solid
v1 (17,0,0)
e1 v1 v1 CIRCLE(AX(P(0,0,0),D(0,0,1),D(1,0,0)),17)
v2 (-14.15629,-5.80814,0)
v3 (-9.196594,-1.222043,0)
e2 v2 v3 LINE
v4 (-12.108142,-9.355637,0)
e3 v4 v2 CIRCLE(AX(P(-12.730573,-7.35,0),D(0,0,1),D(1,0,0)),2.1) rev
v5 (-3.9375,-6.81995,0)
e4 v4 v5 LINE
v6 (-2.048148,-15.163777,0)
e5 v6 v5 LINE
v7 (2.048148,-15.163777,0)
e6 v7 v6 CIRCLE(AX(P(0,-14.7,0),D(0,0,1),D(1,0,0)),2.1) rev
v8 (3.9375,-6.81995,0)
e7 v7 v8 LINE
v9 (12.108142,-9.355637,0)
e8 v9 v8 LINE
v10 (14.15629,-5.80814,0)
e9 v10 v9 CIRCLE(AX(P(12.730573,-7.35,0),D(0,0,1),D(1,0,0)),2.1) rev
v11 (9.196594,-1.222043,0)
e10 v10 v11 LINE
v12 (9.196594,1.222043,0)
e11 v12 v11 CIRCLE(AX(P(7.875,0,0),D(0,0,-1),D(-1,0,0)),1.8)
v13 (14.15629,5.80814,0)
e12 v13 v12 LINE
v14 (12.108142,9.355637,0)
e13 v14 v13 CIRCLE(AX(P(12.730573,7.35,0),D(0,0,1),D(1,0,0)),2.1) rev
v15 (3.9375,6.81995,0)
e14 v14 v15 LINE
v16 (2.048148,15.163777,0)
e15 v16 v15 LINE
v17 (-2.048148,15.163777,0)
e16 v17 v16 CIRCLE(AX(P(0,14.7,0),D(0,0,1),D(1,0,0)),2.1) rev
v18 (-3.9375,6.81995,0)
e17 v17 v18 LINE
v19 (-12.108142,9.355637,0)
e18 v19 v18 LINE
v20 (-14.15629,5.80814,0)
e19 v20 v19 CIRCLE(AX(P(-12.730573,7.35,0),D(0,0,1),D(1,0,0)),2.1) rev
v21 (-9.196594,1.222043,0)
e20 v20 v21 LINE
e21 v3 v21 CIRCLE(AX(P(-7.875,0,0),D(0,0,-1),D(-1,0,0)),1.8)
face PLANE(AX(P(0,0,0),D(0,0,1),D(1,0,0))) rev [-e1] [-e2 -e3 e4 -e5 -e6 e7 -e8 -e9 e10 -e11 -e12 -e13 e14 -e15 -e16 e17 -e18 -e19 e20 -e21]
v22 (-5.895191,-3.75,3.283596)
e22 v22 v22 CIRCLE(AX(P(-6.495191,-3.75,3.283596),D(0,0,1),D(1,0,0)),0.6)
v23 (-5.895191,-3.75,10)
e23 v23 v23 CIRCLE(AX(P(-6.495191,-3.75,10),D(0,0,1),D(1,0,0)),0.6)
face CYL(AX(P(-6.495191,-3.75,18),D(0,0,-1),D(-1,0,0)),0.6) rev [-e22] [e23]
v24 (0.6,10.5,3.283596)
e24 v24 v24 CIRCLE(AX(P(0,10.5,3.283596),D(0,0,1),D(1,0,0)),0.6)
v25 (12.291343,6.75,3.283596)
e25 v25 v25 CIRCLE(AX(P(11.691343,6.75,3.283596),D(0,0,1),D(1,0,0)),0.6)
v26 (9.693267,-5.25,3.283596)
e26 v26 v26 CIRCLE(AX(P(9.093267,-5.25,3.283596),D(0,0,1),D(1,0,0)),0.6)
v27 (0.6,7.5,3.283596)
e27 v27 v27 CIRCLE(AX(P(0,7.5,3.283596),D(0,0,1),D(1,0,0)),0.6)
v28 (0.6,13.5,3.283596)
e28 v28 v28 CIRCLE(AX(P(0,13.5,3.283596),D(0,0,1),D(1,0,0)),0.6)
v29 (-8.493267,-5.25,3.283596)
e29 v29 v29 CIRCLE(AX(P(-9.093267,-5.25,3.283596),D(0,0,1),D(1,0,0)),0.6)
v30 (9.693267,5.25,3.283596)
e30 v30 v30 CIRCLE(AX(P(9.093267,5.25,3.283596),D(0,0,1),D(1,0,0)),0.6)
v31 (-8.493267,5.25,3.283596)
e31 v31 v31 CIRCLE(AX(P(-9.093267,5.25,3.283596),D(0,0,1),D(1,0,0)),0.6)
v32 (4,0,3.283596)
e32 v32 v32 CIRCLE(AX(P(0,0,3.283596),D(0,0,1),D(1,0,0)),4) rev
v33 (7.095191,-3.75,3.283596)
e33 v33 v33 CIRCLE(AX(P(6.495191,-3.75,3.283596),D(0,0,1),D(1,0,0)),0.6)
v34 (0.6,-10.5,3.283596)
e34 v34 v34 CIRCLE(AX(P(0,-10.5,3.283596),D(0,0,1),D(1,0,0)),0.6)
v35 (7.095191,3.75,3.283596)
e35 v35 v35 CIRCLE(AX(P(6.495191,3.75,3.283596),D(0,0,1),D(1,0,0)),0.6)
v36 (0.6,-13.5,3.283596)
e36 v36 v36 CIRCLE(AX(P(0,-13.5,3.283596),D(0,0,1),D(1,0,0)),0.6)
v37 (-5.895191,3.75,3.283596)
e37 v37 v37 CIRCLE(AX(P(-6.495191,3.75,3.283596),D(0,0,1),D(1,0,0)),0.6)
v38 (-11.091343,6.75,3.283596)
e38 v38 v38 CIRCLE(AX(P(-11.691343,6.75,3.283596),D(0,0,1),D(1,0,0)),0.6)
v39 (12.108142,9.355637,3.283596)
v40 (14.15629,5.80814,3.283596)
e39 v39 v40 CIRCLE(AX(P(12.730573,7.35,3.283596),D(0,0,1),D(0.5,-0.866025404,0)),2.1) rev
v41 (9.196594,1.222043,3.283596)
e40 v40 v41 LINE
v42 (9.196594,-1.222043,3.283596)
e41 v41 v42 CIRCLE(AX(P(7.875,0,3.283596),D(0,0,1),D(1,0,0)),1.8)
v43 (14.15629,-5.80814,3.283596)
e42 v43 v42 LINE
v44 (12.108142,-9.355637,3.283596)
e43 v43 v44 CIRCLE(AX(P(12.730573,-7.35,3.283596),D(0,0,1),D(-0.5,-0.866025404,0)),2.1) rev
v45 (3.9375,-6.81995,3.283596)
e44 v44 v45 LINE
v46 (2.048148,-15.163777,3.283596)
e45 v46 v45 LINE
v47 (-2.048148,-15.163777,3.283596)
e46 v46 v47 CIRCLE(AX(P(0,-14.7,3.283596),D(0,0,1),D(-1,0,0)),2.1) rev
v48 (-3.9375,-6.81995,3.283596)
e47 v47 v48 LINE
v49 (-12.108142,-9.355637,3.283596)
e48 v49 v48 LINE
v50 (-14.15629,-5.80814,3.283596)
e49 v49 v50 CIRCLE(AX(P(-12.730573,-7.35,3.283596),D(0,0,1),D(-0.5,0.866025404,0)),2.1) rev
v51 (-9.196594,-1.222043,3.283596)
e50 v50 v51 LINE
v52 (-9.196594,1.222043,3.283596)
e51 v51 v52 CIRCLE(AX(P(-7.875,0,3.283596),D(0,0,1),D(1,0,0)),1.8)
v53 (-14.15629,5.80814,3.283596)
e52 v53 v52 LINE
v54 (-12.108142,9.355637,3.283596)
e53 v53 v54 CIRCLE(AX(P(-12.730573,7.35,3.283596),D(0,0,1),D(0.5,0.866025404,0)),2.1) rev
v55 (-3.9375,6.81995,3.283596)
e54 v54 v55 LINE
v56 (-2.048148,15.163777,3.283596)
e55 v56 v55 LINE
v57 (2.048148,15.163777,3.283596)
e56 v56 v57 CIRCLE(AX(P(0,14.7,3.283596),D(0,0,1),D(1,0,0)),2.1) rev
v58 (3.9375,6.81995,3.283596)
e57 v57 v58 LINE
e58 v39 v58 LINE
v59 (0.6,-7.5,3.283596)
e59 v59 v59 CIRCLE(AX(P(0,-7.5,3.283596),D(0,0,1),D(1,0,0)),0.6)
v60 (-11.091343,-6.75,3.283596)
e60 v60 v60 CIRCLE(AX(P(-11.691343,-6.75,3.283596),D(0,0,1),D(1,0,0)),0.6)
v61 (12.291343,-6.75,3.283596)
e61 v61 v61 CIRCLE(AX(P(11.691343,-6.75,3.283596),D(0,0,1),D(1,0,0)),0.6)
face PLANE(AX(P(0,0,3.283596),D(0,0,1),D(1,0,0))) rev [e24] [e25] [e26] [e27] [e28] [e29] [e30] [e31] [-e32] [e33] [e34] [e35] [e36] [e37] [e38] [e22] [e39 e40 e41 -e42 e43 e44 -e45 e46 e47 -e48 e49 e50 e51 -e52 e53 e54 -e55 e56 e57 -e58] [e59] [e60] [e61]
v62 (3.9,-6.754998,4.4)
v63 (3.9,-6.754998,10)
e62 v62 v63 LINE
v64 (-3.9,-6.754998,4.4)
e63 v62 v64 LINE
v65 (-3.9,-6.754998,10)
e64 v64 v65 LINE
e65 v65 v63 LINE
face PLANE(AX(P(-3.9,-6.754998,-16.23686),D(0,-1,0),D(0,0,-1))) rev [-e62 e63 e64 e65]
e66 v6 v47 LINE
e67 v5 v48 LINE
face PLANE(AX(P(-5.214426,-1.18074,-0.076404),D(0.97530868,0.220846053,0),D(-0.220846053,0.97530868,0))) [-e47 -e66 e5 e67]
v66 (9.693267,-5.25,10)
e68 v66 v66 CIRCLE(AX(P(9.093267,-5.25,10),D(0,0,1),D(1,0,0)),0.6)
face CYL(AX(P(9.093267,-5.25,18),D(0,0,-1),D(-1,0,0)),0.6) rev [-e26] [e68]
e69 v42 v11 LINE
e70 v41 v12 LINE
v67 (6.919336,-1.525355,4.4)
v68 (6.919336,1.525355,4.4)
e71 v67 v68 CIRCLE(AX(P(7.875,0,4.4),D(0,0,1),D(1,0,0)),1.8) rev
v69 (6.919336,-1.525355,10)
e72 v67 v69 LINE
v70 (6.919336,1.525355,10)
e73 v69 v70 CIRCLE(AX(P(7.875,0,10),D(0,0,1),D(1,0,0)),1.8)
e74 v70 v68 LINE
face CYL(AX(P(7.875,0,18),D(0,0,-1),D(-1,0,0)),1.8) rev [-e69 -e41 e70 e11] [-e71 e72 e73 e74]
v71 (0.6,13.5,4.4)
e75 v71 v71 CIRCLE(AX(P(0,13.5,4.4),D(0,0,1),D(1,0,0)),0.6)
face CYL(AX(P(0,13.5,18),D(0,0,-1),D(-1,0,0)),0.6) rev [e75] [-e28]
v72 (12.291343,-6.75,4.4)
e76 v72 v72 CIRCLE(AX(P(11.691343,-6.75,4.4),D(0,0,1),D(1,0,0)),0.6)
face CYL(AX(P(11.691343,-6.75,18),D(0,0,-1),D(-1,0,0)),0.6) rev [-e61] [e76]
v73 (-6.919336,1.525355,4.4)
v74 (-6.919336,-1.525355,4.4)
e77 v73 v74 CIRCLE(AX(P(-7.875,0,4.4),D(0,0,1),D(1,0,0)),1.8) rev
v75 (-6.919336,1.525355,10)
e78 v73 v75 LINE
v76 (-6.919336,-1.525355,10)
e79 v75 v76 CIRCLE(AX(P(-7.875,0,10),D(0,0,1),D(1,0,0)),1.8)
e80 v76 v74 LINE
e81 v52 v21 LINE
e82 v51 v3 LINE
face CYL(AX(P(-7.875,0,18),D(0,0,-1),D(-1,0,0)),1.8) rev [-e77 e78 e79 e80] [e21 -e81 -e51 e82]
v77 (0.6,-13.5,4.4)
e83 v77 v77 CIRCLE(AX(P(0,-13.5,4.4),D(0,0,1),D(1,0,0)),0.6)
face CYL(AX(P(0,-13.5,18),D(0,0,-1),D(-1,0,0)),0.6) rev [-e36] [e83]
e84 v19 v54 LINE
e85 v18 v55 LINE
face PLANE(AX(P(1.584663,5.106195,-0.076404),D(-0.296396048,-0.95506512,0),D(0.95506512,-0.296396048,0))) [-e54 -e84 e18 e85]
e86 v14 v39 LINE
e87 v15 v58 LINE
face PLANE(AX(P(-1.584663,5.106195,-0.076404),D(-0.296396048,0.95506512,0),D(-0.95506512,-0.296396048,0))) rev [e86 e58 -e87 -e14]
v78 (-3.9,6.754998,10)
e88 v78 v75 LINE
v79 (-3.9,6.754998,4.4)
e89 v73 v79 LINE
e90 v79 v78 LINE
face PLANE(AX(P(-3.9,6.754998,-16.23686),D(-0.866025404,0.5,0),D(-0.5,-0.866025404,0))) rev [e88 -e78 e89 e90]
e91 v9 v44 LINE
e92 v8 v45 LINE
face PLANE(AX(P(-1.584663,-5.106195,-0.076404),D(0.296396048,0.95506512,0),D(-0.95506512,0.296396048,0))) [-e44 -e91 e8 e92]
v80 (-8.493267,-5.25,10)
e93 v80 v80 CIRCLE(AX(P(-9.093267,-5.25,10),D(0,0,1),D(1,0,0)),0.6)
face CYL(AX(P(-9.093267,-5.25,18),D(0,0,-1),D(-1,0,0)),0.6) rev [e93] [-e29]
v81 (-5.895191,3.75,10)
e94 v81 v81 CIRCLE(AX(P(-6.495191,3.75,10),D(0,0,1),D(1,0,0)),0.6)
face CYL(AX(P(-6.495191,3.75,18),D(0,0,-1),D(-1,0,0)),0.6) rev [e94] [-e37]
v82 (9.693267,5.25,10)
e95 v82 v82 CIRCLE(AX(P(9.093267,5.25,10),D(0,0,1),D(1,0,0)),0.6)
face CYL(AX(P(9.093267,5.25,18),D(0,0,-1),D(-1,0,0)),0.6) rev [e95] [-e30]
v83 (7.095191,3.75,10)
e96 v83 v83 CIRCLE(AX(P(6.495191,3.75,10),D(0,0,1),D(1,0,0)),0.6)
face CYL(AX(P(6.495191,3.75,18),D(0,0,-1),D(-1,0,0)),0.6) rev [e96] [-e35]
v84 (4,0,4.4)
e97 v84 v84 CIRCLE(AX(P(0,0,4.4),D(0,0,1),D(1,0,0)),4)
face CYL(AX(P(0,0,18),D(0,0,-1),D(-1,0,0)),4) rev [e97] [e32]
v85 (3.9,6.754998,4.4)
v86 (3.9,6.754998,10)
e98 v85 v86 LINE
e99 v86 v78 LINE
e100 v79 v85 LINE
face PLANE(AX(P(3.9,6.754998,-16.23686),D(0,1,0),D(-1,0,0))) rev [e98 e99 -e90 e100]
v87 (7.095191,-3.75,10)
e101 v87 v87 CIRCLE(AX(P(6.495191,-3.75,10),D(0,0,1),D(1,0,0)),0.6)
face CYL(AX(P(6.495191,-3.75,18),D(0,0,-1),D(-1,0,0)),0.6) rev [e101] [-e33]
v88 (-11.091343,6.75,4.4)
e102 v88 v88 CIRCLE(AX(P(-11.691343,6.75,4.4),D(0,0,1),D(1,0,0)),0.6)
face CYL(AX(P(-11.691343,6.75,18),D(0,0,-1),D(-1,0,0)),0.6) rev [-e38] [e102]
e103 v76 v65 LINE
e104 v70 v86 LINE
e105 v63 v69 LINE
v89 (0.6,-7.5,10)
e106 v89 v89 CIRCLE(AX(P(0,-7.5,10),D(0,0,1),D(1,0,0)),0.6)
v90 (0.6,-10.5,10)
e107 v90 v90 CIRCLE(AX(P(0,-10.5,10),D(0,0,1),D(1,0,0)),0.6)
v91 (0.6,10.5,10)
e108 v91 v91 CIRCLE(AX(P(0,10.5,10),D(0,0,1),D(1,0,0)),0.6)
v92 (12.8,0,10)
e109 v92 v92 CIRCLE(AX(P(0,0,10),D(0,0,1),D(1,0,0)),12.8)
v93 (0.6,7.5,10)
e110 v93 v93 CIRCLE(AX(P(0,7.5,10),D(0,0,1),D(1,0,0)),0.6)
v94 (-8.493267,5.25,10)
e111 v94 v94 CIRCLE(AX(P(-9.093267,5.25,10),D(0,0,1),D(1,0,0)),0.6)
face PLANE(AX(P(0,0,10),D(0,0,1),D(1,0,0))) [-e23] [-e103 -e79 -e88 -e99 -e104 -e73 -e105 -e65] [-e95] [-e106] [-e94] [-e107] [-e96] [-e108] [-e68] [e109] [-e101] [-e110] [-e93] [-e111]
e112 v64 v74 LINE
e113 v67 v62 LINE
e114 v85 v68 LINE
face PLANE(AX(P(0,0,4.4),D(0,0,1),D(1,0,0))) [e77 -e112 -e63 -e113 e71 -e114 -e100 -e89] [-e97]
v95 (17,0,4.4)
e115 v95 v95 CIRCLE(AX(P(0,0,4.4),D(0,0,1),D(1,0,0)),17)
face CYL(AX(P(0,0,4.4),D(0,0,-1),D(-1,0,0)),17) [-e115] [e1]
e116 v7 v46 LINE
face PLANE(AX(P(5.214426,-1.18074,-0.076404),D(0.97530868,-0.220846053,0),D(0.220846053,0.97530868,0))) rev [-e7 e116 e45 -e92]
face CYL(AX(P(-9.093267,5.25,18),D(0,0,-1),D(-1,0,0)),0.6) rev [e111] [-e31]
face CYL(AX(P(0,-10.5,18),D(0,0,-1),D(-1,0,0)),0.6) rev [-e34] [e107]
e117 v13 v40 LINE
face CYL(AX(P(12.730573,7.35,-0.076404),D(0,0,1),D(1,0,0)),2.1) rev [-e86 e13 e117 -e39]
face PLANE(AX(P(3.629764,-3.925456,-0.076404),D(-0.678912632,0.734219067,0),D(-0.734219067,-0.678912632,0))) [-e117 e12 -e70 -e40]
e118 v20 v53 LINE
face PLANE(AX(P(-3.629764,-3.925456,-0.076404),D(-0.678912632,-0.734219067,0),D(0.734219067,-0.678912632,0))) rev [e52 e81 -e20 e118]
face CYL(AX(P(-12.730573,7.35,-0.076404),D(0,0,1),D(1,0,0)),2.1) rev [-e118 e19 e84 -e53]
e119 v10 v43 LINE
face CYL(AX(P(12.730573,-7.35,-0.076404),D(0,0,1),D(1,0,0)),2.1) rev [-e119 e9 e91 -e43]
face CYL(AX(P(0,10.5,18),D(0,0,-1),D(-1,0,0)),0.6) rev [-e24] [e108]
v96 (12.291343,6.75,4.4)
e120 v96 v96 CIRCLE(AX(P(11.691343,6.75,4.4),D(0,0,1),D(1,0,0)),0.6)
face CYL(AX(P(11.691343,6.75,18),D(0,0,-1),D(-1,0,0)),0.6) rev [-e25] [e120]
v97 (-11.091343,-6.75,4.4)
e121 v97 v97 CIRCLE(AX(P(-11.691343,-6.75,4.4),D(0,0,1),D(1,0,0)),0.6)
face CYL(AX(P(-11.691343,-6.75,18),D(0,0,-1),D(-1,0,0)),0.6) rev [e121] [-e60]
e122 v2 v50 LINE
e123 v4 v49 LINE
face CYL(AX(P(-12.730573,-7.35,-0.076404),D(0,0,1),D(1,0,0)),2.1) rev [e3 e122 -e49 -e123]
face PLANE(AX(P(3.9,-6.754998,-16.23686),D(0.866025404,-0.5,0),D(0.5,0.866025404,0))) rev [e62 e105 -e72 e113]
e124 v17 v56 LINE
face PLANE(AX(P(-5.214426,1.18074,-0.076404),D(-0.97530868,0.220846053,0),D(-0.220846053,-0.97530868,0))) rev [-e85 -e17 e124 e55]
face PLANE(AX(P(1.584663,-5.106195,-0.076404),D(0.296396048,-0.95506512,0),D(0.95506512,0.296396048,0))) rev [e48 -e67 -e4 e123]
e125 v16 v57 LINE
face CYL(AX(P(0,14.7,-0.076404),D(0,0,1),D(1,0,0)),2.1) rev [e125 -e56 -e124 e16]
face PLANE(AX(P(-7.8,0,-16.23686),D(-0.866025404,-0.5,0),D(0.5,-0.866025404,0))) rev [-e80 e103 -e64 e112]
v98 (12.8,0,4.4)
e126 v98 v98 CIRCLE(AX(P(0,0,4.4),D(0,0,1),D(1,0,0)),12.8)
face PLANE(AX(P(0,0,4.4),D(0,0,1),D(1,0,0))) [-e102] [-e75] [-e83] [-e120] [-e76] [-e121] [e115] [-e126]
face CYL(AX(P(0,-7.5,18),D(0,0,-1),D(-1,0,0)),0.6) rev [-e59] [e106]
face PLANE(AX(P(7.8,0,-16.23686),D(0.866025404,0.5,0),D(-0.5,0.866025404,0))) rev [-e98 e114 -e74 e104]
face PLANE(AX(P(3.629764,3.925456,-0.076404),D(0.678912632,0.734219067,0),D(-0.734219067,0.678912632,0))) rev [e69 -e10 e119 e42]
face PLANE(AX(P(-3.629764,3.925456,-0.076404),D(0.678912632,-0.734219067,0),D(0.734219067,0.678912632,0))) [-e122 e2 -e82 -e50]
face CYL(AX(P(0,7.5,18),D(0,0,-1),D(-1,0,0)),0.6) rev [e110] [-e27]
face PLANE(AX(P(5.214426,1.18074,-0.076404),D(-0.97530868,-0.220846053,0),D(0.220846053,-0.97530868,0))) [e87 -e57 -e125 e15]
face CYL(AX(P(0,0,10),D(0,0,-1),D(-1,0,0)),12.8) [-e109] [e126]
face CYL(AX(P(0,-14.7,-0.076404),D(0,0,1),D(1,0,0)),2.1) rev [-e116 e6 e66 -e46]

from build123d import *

# Parameters (mm, degrees)
SKETCH1_R               = 17
BOSS_EXTRUDE1_DEPTH     = 4.4
CAVITY1_OUTLINE_R       = 3.15
CAVITY1_DEPTH           = 3.283595969
CAVITY1_START           = 1.183595969
CAVITY1_2_OUTLINE_R     = 3.15
CAVITY1_2_OUTLINE_R_2   = 1.575
CAVITY1_2_DEPTH         = 2.1
SKETCH9_R               = 12.8
BOSS_EXTRUDE3_DEPTH     = 5.6
BOSS_EXTRUDE8_DEPTH     = 8
SKETCH2_R               = 0.6
CUT_EXTRUDE1_DEPTH      = 31.033314835
CIRPATTERN1_COUNT       = 6
CUT_EXTRUDE3_DEPTH      = 31.033314835
CUT_EXTRUDE3_DEPTH_BACK = 4
SKETCH4_R               = 4
SKETCH6_R               = 1.8
CUT_EXTRUDE4_DEPTH      = 31.033314835
FILLET1_START           = 10
FILLET1_DEPTH           = 9
CUT_EXTRUDE5_DEPTH      = 27.038433133
CUT_EXTRUDE5_DEPTH_BACK = 5.6


with BuildPart() as part:
    # Sketch1 → Boss-Extrude1 (new body)
    with BuildSketch(Plane.XY):
        Circle(SKETCH1_R)
    extrude(amount=BOSS_EXTRUDE1_DEPTH)

    # Cavity1: read off the stored shape, not the designer's step
    # Cavity1 outline → Cavity1 (cut)
    with BuildSketch(Plane.XY):
        with BuildLine():
            Line((3.9375, 6.819950055), (2.048148228, 15.163776711))
            ThreePointArc((2.048148228, 15.163776711), (0, 16.8), (-2.048148228, 15.163776711))
            Line((-2.048148228, 15.163776711), (-3.9375, 6.819950055))
            Line((-3.9375, 6.819950055), (-12.108141735, 9.355636751))
            ThreePointArc((-12.108141735, 9.355636751), (-14.549226784, 8.4), (-14.156289963, 5.80813996))
            Line((-14.156289963, 5.80813996), (-7.875, 0))
            Line((-7.875, 0), (-14.156289963, -5.80813996))
            ThreePointArc((-14.156289963, -5.80813996), (-14.549226784, -8.4), (-12.108141735, -9.355636751))
            Line((-12.108141735, -9.355636751), (-3.9375, -6.819950055))
            Line((-3.9375, -6.819950055), (-2.048148228, -15.163776711))
            ThreePointArc((-2.048148228, -15.163776711), (0, -16.8), (2.048148228, -15.163776711))
            Line((2.048148228, -15.163776711), (3.9375, -6.819950055))
            Line((3.9375, -6.819950055), (12.108141735, -9.355636751))
            ThreePointArc((12.108141735, -9.355636751), (14.549226784, -8.4), (14.156289963, -5.80813996))
            Line((14.156289963, -5.80813996), (7.875, 0))
            Line((7.875, 0), (14.156289963, 5.80813996))
            ThreePointArc((14.156289963, 5.80813996), (14.549226784, 8.4), (12.108141735, 9.355636751))
            Line((12.108141735, 9.355636751), (3.9375, 6.819950055))
        make_face()
        Circle(CAVITY1_OUTLINE_R, mode=Mode.SUBTRACT)
    extrude(amount=CAVITY1_DEPTH, mode=Mode.SUBTRACT)

    # Cavity1 2 outline → Cavity1 2 (cut)
    with BuildSketch(Plane.XY.offset(CAVITY1_START)):
        Circle(CAVITY1_2_OUTLINE_R)
        Circle(CAVITY1_2_OUTLINE_R_2, mode=Mode.SUBTRACT)
    extrude(amount=CAVITY1_2_DEPTH, mode=Mode.SUBTRACT)

    # Sketch9 → Boss-Extrude3 (add)
    with BuildSketch(Plane.XY.offset(4.4)):
        Circle(SKETCH9_R)
    extrude(amount=BOSS_EXTRUDE3_DEPTH)

    # Sketch12 → Boss-Extrude8 (add)
    with BuildSketch(Plane.XY.offset(10)):
        Polygon((3.9, -6.75499815), (7.8, 0), (3.9, 6.75499815), (-3.9, 6.75499815), (-7.8, 0), (-3.9, -6.75499815), align=None)
    extrude(amount=BOSS_EXTRUDE8_DEPTH)

    # Sketch2 → Cut-Extrude1 (cut, through all)
    with BuildSketch(Plane(origin=(0, 0, 0), x_dir=(-1, 0, 0), z_dir=(0, 0, -1))):
        with Locations(Location((0, 13.5, 0), (0, 0, 180))):
            Circle(SKETCH2_R)
        with Locations(Location((0, 10.5, 0), (0, 0, 180))):
            Circle(SKETCH2_R)
        with Locations(Location((0, 7.5, 0), (0, 0, 180))):
            Circle(SKETCH2_R)
    cut_extrude1 = extrude(amount=-CUT_EXTRUDE1_DEPTH, mode=Mode.SUBTRACT)

    # CirPattern1: Cut-Extrude1 ×6 about axis
    cirpattern1_axis = Axis((0, 0, 0), (0, 0, 1))
    for i in range(1, CIRPATTERN1_COUNT):
        add(cut_extrude1.rotate(cirpattern1_axis, i * 360 / CIRPATTERN1_COUNT), mode=Mode.SUBTRACT)

    # Sketch4 → Cut-Extrude3 (cut, two sides: drawn at the far end of the back side and taken through both)
    with BuildSketch(Plane.XY.offset(-CUT_EXTRUDE3_DEPTH_BACK)):
        Circle(SKETCH4_R)
    extrude(amount=CUT_EXTRUDE3_DEPTH + CUT_EXTRUDE3_DEPTH_BACK, mode=Mode.SUBTRACT)

    # Sketch6 → Cut-Extrude4 (cut, through all)
    with BuildSketch(Plane(origin=(0, 0, 0), x_dir=(-1, 0, 0), z_dir=(0, 0, -1))):
        with Locations(Location((-7.875, 0, 0), (0, 0, 302.067932294))):
            Circle(SKETCH6_R)
        with Locations(Location((7.875, 0, 0), (0, 0, 42.758730598))):
            Circle(SKETCH6_R)
    extrude(amount=-CUT_EXTRUDE4_DEPTH, mode=Mode.SUBTRACT)

    # Fillet1: read off the stored shape, not the designer's step
    # Fillet1 outline → Fillet1 (cut)
    with BuildSketch(Plane.XY.offset(FILLET1_START)):
        with BuildLine():
            Line((-3.9, 6.75499815), (-6.786751346, 1.75499815))
            add(Edge.make_bspline(
                [(-6.786751346, 1.75499815), (-3.9, 6.75499815), (1.873502692, 6.75499815)],
                knots=[0, 0, 0, 1, 1, 1], degree=2, weights=[1, 9, 1]))
            Line((1.873502692, 6.75499815), (-3.9, 6.75499815))
        make_face()
    extrude(amount=FILLET1_DEPTH, mode=Mode.SUBTRACT)

    # Sketch12<4> → Cut-Extrude5 (cut, two sides: drawn at the far end of the back side and taken through both)
    with BuildSketch(Plane.XY.offset(10).offset(-CUT_EXTRUDE5_DEPTH_BACK)):
        Polygon((3.9, -6.75499815), (7.8, 0), (3.9, 6.75499815), (-3.9, 6.75499815), (-7.8, 0), (-3.9, -6.75499815), align=None)
    extrude(amount=CUT_EXTRUDE5_DEPTH + CUT_EXTRUDE5_DEPTH_BACK, mode=Mode.SUBTRACT)


solid = part.part
